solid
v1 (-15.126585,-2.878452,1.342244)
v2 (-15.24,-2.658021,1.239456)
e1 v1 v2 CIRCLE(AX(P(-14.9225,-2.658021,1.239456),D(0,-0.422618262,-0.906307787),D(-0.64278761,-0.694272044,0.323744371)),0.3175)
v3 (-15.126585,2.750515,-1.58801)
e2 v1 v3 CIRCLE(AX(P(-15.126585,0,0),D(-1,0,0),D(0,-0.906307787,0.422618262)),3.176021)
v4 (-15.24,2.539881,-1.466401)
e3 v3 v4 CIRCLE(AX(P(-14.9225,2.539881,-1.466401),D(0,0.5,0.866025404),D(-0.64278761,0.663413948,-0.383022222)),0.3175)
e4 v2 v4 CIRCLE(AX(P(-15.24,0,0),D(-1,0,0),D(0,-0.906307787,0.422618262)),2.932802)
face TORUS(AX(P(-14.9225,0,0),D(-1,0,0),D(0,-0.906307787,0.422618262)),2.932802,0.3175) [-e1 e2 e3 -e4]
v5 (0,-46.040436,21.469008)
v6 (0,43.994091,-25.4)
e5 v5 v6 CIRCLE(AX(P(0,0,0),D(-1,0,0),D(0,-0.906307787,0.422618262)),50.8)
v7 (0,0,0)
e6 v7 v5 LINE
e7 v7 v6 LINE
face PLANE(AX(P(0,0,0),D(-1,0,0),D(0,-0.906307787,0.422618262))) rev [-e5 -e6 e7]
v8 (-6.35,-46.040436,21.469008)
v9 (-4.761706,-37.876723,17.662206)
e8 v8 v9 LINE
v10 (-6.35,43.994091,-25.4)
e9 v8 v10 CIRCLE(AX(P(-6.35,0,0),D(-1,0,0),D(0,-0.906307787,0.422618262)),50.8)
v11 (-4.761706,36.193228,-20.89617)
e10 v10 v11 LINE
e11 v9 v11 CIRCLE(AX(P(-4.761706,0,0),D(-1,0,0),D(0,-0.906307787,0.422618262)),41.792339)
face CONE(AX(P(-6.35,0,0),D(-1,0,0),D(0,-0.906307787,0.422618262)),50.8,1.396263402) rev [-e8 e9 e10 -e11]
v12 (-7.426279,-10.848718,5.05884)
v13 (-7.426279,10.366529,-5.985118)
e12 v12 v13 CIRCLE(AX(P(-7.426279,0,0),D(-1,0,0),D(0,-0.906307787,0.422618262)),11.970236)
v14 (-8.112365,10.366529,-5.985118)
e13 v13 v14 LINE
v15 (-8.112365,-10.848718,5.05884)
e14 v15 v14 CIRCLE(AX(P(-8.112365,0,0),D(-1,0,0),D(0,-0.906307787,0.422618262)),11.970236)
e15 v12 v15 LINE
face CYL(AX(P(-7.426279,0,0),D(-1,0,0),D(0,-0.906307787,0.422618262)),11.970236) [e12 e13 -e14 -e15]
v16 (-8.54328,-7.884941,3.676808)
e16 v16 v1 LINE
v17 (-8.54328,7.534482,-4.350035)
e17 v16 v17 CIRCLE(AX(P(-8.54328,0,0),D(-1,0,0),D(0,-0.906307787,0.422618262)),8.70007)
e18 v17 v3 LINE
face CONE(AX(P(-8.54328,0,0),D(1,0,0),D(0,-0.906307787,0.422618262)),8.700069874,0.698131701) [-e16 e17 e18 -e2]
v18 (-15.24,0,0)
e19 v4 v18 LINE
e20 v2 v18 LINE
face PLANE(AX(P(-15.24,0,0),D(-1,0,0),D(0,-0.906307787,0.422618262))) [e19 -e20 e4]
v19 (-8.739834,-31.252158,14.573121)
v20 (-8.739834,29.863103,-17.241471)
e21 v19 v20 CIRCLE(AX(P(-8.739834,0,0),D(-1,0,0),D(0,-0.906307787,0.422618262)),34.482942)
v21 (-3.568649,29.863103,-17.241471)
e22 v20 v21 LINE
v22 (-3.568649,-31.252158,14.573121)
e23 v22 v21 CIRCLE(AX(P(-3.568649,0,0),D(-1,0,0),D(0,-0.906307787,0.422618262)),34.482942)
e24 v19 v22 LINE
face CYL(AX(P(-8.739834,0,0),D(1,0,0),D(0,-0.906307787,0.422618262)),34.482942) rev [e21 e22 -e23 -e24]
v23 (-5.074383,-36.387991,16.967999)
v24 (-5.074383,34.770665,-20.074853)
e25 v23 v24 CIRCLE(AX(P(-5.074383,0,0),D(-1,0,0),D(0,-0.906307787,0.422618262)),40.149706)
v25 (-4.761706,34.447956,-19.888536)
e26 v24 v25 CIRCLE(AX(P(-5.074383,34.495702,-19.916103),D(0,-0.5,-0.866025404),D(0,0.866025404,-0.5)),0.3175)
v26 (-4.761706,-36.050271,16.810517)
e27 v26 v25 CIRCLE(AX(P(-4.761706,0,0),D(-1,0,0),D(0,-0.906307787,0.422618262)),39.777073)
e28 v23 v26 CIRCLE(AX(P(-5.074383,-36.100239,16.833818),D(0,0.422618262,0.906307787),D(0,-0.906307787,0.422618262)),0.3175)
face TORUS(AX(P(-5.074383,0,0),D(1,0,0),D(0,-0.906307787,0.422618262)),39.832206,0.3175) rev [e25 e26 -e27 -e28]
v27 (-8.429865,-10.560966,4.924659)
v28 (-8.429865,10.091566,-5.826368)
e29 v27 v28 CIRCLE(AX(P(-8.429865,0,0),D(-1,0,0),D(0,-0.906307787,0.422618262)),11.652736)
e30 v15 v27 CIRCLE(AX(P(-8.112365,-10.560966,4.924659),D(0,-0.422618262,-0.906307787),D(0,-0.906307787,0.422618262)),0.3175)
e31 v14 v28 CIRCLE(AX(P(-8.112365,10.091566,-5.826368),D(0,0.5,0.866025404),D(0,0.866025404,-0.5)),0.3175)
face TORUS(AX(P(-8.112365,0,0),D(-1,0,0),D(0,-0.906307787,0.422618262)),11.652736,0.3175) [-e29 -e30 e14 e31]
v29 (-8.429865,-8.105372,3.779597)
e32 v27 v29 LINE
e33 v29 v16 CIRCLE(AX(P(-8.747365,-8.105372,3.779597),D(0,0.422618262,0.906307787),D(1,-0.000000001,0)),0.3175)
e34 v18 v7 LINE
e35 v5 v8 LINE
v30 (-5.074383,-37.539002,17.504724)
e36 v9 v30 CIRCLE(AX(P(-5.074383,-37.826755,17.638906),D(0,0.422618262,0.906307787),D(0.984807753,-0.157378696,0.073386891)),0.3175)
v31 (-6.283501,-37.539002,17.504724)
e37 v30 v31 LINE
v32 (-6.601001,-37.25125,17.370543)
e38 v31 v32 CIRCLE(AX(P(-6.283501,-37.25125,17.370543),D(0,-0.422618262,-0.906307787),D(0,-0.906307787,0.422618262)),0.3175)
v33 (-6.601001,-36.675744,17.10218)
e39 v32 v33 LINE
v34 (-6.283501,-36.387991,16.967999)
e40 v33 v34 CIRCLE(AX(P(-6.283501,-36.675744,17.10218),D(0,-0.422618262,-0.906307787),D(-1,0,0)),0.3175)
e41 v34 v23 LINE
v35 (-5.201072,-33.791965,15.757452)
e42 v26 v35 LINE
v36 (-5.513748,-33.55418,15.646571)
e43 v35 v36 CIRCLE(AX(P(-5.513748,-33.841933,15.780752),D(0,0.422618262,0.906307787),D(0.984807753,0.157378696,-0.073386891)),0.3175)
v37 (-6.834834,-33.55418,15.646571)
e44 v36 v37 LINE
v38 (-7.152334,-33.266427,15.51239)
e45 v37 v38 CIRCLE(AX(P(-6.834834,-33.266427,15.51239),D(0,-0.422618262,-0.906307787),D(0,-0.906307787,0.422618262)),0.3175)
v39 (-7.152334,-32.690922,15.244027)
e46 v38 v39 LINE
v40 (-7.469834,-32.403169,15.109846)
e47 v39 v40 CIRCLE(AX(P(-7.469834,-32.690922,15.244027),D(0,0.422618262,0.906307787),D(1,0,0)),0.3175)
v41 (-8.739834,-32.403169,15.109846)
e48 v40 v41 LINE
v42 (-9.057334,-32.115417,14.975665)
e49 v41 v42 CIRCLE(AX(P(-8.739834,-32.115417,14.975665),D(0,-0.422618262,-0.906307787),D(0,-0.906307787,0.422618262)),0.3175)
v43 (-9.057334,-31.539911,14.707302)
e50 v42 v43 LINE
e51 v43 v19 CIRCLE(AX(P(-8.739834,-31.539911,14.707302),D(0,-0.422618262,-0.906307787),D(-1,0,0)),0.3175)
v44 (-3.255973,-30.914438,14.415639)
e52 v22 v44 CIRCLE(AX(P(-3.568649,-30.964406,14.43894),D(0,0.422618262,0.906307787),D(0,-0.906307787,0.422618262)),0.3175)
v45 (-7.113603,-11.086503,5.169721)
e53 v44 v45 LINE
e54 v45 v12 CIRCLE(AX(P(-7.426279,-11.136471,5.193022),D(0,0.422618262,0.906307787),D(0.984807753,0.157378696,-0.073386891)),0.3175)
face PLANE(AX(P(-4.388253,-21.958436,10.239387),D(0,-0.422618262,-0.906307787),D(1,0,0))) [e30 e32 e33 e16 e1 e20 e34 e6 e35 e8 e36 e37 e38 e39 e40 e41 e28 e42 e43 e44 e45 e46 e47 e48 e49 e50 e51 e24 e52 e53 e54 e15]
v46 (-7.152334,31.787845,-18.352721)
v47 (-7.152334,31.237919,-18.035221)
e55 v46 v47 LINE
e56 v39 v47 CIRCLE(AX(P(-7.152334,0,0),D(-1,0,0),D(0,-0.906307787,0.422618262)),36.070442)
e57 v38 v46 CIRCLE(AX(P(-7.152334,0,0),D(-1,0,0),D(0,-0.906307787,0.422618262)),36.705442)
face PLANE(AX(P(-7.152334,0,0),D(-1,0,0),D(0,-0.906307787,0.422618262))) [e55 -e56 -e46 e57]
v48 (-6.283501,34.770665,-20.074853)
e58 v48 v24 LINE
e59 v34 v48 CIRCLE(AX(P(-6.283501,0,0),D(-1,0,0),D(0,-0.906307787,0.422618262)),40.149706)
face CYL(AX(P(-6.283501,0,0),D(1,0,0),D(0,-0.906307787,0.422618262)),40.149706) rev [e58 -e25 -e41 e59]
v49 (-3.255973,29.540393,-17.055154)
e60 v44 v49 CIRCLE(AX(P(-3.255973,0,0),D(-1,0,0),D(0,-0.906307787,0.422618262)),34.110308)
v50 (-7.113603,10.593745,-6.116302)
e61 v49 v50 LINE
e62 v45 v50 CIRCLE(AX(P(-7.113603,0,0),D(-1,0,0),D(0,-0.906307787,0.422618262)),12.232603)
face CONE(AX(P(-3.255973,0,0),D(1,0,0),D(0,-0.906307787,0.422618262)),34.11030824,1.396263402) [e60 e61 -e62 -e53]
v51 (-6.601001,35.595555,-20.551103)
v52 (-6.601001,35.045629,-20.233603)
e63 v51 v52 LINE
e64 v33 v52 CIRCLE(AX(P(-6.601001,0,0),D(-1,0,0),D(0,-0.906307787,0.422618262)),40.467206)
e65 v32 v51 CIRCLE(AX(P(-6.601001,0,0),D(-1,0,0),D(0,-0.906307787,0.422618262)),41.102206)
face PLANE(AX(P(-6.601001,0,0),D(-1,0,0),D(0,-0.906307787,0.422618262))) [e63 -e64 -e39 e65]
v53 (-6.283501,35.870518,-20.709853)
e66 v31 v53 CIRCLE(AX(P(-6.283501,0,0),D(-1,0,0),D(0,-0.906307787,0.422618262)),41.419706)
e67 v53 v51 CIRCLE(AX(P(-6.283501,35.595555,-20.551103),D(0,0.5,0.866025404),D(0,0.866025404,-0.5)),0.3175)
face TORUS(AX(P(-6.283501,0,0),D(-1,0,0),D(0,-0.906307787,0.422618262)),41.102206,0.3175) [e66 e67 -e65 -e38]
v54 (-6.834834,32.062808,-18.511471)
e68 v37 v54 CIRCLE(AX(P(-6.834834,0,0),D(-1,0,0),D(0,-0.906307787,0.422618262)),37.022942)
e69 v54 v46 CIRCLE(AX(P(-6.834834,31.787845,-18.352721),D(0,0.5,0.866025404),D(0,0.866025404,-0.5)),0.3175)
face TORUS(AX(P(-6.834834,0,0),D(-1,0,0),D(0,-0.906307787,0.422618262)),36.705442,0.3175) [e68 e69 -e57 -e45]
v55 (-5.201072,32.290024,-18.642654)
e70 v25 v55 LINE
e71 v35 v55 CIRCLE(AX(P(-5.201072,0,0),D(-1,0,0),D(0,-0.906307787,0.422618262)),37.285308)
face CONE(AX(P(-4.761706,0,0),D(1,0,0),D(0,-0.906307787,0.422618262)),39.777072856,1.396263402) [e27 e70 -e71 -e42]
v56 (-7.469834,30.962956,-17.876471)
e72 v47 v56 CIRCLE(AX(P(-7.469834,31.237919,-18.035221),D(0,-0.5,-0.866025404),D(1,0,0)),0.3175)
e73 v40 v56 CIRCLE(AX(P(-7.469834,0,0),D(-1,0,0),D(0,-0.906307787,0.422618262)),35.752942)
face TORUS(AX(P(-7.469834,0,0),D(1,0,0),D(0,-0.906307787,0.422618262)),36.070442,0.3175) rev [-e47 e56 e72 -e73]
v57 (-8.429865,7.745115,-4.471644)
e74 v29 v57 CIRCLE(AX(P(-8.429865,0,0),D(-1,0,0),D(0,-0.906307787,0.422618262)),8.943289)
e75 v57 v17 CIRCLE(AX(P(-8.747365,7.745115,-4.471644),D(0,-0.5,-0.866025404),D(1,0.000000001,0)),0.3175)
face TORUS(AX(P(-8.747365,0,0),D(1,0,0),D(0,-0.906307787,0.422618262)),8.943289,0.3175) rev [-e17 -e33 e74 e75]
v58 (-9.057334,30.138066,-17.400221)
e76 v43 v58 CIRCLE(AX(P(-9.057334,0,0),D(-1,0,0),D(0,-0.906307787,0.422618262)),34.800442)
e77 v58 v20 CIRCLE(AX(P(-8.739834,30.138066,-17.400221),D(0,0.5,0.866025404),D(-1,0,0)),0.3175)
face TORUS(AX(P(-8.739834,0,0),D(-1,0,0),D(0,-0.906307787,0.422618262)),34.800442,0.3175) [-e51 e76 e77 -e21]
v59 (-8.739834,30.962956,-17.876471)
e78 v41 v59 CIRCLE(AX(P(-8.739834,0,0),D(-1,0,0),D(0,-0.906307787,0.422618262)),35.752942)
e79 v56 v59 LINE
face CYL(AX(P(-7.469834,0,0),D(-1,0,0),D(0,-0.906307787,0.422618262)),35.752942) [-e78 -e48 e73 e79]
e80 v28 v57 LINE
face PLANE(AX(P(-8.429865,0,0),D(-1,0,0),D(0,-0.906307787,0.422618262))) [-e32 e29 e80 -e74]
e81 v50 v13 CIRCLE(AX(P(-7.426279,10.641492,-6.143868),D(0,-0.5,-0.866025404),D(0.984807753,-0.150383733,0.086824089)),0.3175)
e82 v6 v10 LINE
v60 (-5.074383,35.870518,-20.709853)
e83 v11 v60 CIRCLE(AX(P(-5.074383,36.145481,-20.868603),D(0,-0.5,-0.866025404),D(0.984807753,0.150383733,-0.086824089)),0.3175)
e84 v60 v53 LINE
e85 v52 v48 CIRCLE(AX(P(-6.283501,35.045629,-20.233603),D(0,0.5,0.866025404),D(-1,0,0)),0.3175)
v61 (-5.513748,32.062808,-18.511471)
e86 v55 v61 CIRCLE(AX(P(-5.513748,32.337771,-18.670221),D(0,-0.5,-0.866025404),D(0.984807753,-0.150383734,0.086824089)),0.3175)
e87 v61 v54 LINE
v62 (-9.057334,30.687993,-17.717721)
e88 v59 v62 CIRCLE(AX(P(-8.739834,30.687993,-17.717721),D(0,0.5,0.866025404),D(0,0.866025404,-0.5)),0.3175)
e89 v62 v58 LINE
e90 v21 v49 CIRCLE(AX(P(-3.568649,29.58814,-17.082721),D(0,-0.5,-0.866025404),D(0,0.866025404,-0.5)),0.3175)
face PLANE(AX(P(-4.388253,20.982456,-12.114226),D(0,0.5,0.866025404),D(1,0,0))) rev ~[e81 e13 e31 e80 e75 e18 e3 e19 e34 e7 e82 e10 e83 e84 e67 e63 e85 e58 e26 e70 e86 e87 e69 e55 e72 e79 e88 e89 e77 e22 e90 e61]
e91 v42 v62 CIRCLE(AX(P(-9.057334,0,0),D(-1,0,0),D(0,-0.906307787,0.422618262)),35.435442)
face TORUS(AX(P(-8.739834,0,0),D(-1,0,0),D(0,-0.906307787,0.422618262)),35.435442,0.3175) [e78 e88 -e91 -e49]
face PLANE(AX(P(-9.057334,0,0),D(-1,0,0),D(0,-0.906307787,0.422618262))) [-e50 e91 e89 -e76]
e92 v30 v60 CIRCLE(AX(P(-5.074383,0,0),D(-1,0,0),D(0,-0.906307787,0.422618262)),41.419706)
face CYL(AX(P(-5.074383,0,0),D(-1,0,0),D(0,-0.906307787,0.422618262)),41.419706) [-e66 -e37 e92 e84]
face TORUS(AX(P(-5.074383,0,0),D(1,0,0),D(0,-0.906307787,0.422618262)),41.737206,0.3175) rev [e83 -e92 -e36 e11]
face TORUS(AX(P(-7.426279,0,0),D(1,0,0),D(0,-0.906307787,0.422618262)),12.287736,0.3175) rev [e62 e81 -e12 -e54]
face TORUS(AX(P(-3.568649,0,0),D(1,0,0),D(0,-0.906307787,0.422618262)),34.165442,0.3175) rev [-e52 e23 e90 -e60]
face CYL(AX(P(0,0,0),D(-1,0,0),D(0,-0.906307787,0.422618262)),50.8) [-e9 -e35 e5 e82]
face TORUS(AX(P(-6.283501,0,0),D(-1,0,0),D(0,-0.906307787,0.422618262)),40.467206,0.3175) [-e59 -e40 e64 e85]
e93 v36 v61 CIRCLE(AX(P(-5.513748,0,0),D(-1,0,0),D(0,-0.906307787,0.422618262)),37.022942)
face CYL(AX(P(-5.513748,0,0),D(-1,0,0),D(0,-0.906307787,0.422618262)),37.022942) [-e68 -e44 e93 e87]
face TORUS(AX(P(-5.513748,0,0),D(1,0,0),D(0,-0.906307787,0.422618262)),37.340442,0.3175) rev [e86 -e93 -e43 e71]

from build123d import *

# Parameters (mm, degrees)
F1_ANGLE_BACK = 65
F1_ANGLE      = 185


# Not quite as in the source:
# - a feature of the source that left no trace in its solid (it failed there, or was rolled back) is left out


with BuildPart() as f1:
    # F0 (on Front) → F1 (revolve)
    with BuildSketch(Plane.XZ, mode=Mode.PRIVATE) as f1_sk:
        with BuildLine():
            Line((-15.24, 0), (0, 0))
            Line((0, 0), (0, 50.8))
            Line((0, 50.8), (-6.35, 50.8))
            Line((-6.35, 50.8), (-4.7617064118, 41.792339449))
            ThreePointArc((-4.7617064118, 41.792339449), (-4.8311637627, 41.5331210865), (-5.0743828734, 41.4197061526))
            Line((-5.0743828734, 41.4197061526), (-6.2835011077, 41.4197061526))
            ThreePointArc((-6.2835011077, 41.4197061526), (-6.5080075107, 41.3267125556), (-6.6010011077, 41.1022061526))
            Line((-6.6010011077, 41.1022061526), (-6.6010011077, 40.4672061526))
            ThreePointArc((-6.6010011077, 40.4672061526), (-6.5080075107, 40.2426997495), (-6.2835011077, 40.1497061526))
            Line((-6.2835011077, 40.1497061526), (-5.0743828734, 40.1497061526))
            ThreePointArc((-5.0743828734, 40.1497061526), (-4.8311637627, 40.0362912186), (-4.7617064118, 39.7770728561))
            Line((-4.7617064118, 39.7770728561), (-5.2010717431, 37.2853082403))
            ThreePointArc((-5.2010717431, 37.2853082403), (-5.3096631386, 37.0972224261), (-5.5137482047, 37.0229415367))
            Line((-5.5137482047, 37.0229415367), (-6.8348340718, 37.0229415367))
            ThreePointArc((-6.8348340718, 37.0229415367), (-7.0593404748, 36.9299479398), (-7.1523340718, 36.7054415367))
            Line((-7.1523340718, 36.7054415367), (-7.1523340718, 36.0704415367))
            ThreePointArc((-7.1523340718, 36.0704415367), (-7.2453276688, 35.8459351337), (-7.4698340718, 35.7529415367))
            Line((-7.4698340718, 35.7529415367), (-8.7398340718, 35.7529415367))
            ThreePointArc((-8.7398340718, 35.7529415367), (-8.9643404748, 35.6599479398), (-9.0573340718, 35.4354415367))
            Line((-9.0573340718, 35.4354415367), (-9.0573340718, 34.8004415367))
            ThreePointArc((-9.0573340718, 34.8004415367), (-8.9643404748, 34.5759351337), (-8.7398340718, 34.4829415367))
            Line((-8.7398340718, 34.4829415367), (-3.5686493249, 34.4829415367))
            ThreePointArc((-3.5686493249, 34.4829415367), (-3.3254302142, 34.3695266028), (-3.2559728633, 34.1103082403))
            Line((-3.2559728633, 34.1103082403), (-7.113602572, 12.2326030065))
            ThreePointArc((-7.113602572, 12.2326030065), (-7.2221939675, 12.0445171922), (-7.4262790336, 11.9702363029))
            Line((-7.4262790336, 11.9702363029), (-8.1123649007, 11.9702363029))
            ThreePointArc((-8.1123649007, 11.9702363029), (-8.3368713037, 11.8772427059), (-8.4298649007, 11.6527363029))
            Line((-8.4298649007, 11.6527363029), (-8.4298649007, 8.9432889844))
            ThreePointArc((-8.4298649007, 8.9432889844), (-8.4596121783, 8.8091076862), (-8.5432798346, 8.7000698737))
            Line((-8.5432798346, 8.7000698737), (-15.1265850661, 3.176020882))
            ThreePointArc((-15.1265850661, 3.176020882), (-15.2102527224, 3.0669830694), (-15.24, 2.9328017713))
            Line((-15.24, 2.9328017713), (-15.24, 0))
        make_face()
    revolve(f1_sk.sketch.rotate(Axis((-7.62, 0, 0), (-1, 0, 0)), -F1_ANGLE_BACK), axis=Axis((-7.62, 0, 0), (-1, 0, 0)), revolution_arc=F1_ANGLE)


solid = f1.part
